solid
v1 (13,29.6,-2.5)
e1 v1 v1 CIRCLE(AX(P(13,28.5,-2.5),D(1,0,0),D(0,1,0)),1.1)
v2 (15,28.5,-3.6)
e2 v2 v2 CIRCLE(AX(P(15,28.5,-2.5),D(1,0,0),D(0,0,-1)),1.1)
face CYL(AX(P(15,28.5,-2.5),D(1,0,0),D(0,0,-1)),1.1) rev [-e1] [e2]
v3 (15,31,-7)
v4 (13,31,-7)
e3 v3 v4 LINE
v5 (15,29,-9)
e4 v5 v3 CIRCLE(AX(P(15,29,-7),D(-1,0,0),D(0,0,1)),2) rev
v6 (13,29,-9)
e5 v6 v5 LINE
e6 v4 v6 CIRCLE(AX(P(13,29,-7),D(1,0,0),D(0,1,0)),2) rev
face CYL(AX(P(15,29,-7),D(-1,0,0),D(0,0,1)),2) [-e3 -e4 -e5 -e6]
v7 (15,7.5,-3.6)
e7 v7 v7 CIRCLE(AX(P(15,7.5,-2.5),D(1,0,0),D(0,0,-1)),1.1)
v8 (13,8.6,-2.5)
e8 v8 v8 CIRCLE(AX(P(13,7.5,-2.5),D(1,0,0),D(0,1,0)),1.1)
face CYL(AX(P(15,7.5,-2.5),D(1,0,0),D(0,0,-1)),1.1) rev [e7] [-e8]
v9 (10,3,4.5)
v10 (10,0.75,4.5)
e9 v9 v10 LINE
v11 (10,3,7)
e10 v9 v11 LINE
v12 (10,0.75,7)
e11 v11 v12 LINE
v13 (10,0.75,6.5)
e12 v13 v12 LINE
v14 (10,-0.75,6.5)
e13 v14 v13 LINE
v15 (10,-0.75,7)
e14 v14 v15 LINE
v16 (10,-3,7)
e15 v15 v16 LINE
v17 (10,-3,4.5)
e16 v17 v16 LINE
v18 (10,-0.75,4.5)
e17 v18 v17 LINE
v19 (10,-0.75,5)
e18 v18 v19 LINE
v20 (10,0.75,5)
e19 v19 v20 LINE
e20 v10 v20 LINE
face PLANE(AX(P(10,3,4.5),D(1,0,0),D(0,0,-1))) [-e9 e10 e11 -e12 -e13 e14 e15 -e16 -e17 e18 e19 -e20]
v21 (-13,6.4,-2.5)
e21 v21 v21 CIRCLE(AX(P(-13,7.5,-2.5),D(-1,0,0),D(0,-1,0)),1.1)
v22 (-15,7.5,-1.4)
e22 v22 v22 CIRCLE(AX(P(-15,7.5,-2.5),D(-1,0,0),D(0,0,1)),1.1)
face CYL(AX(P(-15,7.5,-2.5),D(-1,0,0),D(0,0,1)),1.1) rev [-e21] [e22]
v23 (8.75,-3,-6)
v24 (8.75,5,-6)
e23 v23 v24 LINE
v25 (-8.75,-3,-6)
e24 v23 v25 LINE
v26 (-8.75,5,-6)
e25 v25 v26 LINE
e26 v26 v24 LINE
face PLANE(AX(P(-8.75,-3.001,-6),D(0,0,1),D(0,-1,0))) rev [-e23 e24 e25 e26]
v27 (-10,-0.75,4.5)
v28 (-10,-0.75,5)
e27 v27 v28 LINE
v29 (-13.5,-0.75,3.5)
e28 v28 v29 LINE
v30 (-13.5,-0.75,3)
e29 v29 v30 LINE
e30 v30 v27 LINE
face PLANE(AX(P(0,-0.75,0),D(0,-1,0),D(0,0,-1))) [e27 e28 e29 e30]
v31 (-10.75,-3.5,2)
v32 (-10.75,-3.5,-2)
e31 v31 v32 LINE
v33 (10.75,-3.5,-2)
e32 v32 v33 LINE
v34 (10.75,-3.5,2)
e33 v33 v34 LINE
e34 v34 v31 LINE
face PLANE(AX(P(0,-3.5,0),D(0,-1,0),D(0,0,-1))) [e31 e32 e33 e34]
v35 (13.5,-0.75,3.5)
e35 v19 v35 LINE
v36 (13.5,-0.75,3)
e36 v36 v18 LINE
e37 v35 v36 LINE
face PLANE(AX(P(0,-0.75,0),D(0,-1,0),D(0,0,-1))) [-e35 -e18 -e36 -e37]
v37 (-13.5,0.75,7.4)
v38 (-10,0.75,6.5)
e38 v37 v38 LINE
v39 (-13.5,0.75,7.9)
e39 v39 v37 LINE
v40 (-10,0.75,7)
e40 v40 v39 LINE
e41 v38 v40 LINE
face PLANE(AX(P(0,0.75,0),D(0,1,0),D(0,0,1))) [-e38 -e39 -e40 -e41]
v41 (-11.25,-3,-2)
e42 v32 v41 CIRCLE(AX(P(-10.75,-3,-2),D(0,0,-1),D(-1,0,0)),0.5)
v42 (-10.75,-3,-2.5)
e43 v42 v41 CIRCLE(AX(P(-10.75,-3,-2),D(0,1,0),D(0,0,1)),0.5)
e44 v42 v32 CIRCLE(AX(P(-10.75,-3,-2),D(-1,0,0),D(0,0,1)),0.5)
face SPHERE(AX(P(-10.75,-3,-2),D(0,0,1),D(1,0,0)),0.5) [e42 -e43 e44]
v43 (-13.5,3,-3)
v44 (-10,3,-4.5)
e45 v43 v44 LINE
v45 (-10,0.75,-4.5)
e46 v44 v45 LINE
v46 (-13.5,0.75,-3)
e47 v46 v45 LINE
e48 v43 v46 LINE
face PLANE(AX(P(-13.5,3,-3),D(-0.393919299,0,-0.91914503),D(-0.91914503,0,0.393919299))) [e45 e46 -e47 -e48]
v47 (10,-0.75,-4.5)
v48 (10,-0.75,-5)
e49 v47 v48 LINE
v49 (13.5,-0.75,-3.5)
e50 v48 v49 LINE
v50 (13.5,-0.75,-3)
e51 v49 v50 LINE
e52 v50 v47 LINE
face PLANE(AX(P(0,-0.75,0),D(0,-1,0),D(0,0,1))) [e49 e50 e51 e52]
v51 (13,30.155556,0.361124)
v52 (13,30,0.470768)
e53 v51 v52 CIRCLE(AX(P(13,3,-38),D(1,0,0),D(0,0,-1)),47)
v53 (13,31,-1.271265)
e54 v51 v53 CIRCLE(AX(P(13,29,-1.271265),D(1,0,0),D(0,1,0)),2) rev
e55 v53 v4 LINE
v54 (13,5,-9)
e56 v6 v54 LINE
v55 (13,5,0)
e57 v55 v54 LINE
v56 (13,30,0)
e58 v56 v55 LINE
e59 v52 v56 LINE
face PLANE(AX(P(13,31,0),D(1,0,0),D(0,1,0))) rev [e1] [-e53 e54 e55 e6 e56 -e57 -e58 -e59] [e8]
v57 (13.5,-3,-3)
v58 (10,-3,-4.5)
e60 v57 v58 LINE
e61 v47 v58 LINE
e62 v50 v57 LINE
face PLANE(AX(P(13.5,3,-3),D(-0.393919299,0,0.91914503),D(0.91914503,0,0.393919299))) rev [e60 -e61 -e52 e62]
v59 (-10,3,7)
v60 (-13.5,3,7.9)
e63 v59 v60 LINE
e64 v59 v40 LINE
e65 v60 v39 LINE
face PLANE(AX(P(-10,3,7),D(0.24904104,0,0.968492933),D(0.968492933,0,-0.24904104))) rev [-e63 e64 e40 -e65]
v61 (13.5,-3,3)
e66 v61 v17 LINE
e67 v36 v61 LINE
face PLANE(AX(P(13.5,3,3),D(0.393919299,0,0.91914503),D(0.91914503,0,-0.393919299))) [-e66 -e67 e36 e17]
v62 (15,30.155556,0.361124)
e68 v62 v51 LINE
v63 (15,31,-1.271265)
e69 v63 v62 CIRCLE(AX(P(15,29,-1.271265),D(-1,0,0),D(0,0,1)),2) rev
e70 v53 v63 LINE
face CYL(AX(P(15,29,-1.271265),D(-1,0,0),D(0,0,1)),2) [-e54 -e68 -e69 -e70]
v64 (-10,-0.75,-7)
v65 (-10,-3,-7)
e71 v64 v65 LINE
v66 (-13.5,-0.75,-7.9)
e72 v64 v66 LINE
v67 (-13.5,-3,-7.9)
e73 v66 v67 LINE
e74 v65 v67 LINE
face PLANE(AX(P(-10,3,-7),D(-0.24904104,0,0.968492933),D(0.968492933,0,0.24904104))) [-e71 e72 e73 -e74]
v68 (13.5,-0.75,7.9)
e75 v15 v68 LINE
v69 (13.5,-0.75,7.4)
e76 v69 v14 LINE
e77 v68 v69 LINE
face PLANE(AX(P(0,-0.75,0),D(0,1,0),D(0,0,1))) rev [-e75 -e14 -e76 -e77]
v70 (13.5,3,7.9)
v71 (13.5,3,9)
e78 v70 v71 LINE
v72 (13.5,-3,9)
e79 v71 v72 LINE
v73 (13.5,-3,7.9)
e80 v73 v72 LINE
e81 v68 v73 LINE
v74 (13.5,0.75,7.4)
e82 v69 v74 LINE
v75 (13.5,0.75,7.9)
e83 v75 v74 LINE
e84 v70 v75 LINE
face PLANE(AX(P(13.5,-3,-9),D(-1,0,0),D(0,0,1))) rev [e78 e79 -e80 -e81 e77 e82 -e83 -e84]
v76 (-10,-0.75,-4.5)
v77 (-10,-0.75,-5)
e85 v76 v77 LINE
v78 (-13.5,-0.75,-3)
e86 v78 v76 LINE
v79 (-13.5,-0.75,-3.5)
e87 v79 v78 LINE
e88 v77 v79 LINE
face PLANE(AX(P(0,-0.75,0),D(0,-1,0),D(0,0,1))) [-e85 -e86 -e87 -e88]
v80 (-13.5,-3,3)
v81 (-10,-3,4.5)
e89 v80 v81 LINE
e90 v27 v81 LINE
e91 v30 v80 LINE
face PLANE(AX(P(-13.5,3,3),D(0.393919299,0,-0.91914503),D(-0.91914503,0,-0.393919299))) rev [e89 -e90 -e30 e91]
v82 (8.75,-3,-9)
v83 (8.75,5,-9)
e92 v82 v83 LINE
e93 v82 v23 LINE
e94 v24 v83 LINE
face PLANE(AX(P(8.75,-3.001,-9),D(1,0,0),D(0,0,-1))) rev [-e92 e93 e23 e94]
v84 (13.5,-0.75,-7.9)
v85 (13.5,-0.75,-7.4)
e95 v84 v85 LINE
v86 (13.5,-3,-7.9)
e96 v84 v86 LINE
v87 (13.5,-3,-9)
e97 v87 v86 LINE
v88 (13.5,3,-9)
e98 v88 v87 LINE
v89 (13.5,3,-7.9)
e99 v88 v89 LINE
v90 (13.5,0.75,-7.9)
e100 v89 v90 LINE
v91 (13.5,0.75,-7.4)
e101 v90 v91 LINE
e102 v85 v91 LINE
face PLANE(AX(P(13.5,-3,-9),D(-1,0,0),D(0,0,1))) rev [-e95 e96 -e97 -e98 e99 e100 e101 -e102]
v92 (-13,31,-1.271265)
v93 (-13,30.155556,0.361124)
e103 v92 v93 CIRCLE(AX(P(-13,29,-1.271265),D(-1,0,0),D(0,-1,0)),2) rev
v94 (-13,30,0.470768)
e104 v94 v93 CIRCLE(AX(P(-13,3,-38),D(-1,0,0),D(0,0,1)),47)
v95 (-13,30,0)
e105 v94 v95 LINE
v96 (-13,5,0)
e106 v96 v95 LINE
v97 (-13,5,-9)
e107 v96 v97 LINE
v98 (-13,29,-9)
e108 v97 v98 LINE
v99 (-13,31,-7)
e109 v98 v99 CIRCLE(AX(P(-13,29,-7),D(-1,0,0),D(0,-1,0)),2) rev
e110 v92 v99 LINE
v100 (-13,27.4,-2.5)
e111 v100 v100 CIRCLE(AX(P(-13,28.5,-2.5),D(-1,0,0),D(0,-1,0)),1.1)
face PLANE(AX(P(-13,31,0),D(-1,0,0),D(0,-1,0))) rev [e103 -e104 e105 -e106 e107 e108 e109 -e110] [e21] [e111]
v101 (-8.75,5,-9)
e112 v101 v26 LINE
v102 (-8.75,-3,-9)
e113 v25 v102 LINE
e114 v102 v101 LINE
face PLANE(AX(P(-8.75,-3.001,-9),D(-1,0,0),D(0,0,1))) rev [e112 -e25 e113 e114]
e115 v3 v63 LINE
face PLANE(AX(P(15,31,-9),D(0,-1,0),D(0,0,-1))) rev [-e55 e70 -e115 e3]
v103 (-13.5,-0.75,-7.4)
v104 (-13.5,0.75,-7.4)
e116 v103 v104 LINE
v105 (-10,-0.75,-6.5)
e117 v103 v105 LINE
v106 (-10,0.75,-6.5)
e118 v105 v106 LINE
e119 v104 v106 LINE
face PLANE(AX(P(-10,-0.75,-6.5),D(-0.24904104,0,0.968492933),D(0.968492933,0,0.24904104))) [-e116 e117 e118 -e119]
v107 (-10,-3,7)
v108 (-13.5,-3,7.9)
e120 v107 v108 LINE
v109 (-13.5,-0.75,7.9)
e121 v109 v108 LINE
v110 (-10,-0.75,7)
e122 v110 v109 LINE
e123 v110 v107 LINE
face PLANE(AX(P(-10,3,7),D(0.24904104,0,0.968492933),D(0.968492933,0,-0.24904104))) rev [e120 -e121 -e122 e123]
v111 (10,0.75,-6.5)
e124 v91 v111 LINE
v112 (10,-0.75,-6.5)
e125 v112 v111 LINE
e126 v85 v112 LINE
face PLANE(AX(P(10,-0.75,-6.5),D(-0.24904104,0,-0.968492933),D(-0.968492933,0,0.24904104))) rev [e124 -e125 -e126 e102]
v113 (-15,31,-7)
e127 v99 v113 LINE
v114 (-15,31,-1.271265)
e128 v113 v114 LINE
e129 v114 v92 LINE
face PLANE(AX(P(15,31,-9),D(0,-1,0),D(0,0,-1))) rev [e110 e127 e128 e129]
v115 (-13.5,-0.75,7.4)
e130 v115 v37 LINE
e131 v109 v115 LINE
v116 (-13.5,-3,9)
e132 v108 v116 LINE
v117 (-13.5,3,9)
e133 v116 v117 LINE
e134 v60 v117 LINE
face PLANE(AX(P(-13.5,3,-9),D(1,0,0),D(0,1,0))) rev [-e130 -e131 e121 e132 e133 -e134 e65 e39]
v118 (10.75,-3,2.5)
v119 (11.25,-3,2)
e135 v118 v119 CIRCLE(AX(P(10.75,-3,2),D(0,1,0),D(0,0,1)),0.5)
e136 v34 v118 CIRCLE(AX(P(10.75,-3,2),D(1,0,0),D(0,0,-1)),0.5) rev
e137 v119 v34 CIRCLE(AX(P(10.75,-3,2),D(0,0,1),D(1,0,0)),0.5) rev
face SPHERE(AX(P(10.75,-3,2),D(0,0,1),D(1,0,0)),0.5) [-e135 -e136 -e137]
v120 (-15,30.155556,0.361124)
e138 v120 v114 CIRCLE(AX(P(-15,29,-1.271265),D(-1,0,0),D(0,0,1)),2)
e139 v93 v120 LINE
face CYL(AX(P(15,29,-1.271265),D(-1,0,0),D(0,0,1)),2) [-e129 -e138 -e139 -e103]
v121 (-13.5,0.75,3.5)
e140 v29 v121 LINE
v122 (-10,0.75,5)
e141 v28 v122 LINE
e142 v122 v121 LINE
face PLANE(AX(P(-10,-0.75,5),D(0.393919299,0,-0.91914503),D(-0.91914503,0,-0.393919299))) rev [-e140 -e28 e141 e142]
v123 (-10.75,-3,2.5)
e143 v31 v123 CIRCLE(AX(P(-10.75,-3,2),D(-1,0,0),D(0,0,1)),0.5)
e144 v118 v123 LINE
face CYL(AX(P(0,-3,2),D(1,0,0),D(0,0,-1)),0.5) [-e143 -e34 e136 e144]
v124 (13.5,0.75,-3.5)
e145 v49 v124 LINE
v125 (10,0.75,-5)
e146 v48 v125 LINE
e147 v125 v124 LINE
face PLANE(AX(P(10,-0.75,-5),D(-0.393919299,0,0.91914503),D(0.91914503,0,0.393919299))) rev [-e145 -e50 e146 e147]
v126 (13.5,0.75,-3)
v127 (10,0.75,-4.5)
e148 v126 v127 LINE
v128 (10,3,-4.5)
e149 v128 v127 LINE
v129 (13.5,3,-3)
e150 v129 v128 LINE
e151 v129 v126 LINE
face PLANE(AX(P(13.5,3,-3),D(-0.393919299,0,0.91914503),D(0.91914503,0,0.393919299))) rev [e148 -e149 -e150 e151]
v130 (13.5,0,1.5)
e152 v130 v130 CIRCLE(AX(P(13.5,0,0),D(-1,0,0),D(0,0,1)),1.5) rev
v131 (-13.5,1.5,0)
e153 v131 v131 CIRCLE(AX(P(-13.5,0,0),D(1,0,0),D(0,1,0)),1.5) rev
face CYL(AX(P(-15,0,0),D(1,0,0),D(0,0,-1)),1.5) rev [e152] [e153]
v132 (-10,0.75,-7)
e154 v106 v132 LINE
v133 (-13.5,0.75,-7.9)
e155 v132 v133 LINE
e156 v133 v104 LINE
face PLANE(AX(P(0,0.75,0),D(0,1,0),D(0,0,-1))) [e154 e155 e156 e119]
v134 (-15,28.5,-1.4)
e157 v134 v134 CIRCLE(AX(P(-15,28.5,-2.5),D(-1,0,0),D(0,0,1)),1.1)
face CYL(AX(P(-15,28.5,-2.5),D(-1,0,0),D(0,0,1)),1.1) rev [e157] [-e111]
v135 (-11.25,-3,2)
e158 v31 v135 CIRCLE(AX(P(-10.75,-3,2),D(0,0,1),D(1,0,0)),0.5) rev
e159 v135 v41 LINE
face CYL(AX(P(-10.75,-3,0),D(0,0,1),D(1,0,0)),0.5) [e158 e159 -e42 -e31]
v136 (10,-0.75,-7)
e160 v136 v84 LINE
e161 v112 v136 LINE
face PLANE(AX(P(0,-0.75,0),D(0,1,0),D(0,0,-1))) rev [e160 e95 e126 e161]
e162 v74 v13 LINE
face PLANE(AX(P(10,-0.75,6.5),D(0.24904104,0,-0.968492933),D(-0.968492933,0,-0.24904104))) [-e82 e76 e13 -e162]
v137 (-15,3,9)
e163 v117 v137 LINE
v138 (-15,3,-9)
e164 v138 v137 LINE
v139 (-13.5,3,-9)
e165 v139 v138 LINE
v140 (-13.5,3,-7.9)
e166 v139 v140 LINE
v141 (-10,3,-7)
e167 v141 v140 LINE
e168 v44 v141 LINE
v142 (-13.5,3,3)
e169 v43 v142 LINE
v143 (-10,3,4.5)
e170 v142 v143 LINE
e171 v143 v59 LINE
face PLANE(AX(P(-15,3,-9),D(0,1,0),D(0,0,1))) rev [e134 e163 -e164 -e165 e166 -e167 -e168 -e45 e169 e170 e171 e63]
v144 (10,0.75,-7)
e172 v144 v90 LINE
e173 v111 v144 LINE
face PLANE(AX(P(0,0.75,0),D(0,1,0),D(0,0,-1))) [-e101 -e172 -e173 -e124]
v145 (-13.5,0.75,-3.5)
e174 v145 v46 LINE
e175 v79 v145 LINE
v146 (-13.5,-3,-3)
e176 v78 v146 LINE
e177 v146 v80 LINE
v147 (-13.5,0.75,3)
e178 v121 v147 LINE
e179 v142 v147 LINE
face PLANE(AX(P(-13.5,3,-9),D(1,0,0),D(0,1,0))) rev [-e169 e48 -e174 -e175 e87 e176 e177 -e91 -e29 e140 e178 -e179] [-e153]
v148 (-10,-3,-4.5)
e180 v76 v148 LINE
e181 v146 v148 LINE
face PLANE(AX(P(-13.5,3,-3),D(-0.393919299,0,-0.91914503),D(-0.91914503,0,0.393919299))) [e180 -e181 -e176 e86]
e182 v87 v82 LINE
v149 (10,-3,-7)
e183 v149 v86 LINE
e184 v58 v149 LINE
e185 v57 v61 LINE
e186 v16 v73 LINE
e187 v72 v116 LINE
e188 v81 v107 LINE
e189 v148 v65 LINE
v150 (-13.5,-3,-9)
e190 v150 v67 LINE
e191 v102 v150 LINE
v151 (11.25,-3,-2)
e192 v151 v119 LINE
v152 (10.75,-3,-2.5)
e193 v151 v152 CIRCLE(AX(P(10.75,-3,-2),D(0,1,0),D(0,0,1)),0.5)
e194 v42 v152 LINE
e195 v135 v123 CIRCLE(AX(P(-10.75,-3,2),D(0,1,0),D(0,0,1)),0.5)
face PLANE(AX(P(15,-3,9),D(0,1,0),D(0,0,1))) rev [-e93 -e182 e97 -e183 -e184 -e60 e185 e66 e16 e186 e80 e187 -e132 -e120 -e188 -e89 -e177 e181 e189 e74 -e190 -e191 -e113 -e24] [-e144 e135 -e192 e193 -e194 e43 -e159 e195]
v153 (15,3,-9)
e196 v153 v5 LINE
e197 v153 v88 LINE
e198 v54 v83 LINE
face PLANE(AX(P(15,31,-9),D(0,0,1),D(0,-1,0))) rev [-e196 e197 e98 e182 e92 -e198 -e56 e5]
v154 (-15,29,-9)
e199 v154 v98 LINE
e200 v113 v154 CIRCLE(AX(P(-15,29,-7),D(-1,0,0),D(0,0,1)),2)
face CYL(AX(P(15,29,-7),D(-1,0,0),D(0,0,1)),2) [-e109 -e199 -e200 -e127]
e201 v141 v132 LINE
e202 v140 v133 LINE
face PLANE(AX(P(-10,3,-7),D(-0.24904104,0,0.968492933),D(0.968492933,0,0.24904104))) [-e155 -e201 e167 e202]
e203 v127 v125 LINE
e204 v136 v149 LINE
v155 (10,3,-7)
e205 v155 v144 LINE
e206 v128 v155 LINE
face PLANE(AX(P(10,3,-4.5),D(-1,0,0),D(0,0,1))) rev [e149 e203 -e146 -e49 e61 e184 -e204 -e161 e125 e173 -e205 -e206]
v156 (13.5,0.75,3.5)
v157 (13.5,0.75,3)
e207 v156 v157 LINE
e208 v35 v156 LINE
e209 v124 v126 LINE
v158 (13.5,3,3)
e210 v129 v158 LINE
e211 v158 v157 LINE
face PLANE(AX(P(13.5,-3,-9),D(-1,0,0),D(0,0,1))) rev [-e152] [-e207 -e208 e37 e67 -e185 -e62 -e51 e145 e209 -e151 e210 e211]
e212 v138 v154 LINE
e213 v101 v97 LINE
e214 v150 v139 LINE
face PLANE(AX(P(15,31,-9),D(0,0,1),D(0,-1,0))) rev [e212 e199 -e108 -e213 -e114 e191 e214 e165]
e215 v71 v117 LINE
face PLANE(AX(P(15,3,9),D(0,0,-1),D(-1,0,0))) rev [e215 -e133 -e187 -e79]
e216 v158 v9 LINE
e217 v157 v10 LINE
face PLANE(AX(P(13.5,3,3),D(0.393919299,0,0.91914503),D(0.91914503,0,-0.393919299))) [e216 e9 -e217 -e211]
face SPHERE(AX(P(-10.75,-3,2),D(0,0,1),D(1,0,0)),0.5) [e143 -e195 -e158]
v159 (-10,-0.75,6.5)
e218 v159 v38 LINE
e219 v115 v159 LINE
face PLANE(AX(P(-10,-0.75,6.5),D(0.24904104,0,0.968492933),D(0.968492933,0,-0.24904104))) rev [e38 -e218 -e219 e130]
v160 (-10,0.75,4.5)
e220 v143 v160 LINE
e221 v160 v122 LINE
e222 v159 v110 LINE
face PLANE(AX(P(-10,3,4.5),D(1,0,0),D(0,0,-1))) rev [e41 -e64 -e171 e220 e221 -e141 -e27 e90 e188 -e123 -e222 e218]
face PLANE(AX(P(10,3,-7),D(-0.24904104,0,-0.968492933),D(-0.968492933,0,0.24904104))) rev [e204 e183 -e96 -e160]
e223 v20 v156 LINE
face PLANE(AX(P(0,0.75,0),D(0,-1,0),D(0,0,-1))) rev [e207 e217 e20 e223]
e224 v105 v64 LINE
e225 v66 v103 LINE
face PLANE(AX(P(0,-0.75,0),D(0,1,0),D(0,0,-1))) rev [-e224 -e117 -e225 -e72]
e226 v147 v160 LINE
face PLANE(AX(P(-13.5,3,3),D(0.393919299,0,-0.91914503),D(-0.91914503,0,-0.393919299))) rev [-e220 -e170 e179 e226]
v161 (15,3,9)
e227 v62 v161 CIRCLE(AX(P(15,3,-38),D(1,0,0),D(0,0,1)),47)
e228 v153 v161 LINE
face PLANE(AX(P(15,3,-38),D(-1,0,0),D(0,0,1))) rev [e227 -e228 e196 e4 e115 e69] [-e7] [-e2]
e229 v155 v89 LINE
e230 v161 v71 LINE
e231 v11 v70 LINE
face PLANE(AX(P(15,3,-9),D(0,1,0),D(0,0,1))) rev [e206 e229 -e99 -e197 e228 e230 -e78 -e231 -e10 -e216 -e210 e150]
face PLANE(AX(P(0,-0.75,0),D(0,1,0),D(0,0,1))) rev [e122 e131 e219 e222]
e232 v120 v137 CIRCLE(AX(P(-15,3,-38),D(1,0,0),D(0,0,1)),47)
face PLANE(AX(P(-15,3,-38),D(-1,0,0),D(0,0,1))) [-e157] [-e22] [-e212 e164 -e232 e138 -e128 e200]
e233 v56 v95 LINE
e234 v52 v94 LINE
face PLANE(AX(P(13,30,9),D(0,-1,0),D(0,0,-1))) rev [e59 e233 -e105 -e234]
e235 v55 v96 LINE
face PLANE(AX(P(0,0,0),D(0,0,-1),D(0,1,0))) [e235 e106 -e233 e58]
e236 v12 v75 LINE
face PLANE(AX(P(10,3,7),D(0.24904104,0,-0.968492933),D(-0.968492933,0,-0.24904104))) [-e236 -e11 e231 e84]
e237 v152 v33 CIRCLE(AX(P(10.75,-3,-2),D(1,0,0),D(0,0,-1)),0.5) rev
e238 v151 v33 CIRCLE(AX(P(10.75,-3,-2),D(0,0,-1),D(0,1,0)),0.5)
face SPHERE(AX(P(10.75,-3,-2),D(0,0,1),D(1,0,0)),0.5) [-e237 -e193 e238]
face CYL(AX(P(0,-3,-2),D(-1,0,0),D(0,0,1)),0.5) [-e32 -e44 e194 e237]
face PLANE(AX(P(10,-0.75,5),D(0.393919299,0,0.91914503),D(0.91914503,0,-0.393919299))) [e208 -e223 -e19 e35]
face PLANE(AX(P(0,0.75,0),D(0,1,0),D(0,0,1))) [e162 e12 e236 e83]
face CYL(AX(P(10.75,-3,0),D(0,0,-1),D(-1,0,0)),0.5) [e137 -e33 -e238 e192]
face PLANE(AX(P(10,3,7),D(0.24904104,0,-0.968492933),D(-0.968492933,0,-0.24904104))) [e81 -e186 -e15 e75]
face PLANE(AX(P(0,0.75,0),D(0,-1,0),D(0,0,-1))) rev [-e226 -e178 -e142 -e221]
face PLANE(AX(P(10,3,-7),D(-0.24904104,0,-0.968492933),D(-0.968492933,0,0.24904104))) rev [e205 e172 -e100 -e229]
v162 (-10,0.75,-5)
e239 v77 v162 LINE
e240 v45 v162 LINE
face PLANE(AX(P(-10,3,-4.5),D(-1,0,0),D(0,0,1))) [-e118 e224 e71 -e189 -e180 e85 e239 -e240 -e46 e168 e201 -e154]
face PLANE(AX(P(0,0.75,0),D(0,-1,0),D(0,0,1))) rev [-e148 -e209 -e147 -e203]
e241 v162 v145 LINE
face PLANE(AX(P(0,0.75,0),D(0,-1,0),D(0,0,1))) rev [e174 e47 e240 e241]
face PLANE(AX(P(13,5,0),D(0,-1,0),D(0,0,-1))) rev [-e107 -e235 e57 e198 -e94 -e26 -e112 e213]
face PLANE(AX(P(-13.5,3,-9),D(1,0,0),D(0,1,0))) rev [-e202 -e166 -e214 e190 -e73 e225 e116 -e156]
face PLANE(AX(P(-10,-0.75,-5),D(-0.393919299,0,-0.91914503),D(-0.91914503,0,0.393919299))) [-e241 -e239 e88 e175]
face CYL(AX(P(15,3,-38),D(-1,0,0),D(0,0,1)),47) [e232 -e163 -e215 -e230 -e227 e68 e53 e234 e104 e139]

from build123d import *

# Parameters (mm, degrees)
EXTRUDE_1_DEPTH             = 15
CUT_EXTRUDE_1_DEPTH         = 9
FILLET_1_R                  = 2
CUT_EXTRUDE_2_REACH         = 33.337
SKETCH_4_R                  = 1.5000000000000007
CUT_EXTRUDE_3_DEPTH         = 45.068129073061414
SKETCH_6_W                  = 1.5
SKETCH_6_H                  = 6
CUT_EXTRUDE_5_DEPTH         = 39.8587184554509
CUT_EXTRUDE_4_DEPTH         = 6
SKETCH_7_W                  = 22.5
SKETCH_7_H                  = 5
EXTRUDE_2_DEPTH             = 0.5
FILLET_2_R                  = 0.5
HOLE_WIZARD_2_2_2_2_1_D     = 2.2
HOLE_WIZARD_2_2_2_2_1_DEPTH = 2
MIRROR_2_COPY_1_DEPTH       = 6
SKETCH_10_W                 = 26.000000000000004
SKETCH_10_H                 = 2.9999999999999964
CUT_EXTRUDE_6_DEPTH         = 36.59494346111538
EXTRUDE_3_DEPTH             = 0.75
MIRROR_4_COPY_1_DEPTH       = 0.75


with BuildPart() as part:
    # ｽｹｯﾁ1 → ﾎﾞｽ - 押し出し1 (new, symmetric)
    with BuildSketch(Plane(origin=(0, 0, 0), x_dir=(0, 0, -1), z_dir=(1, 0, 0))):
        with BuildLine():
            Line((8.999999999999996, 31.000000000000004), (0.2508278236462402, 31))
            ThreePointArc((0.2508278236462402, 31), (-6.627408015078736, 17.74430242011084), (-9, 3))
            Line((-9, 3), (-9, -3))
            Line((-9, -3), (9, -2.999999999999999))
            Line((9, -2.999999999999999), (8.999999999999996, 31.000000000000004))
        make_face()
    extrude(amount=EXTRUDE_1_DEPTH, both=True)

    # ｽｹｯﾁ2 → ｶｯﾄ - 押し出し1 (cut)
    with BuildSketch(Plane(origin=(0, 9.2e-16, -9), x_dir=(-1, 0, 0), z_dir=(0, 1e-16, -1))):
        Polygon((-13, 31.000000000000004), (13, 31.000000000000004), (13.000000000000002, 5), (-12.999999999999996, 5), align=None)
    extrude(amount=-CUT_EXTRUDE_1_DEPTH, mode=Mode.SUBTRACT)

    # ﾌｨﾚｯﾄ1
    fillet_1_edges = [part.edges().sort_by_distance(p)[0] for p in [
        (-14, 31.000000000000004, -8.999999999999996),
    ]]
    fillet(fillet_1_edges, radius=FILLET_1_R)
    fillet_1_2_edges = [part.edges().sort_by_distance(p)[0] for p in [
        (14, 31.000000000000004, -8.999999999999996),
    ]]
    fillet(fillet_1_2_edges, radius=FILLET_1_R)
    fillet_1_3_edges = [part.edges().sort_by_distance(p)[0] for p in [
        (-14, 31, -0.2508278236462367),
    ]]
    fillet(fillet_1_3_edges, radius=FILLET_1_R)

    # ｽｹｯﾁ3 → ｶｯﾄ - 押し出し2 (cut, up to next)
    with BuildSketch(Plane(origin=(0, 5, 5.1e-16), x_dir=(1, 0, 0), z_dir=(0, 1, 1e-16)), mode=Mode.PRIVATE) as cut_extrude_2_sk1:
        Polygon((-8.749999999999998, 9), (8.750000000000002, 9), (8.750000000000004, 5.999999999999999), (-8.749999999999998, 5.999999999999999), align=None)
    cut_extrude_2_tool1 = extrude(cut_extrude_2_sk1.sketch, amount=-CUT_EXTRUDE_2_REACH, mode=Mode.PRIVATE) & part.part
    add(cut_extrude_2_tool1.solids().sort_by_distance((0, 5, -7.5))[0], mode=Mode.SUBTRACT)

    # ｽｹｯﾁ4 → ｶｯﾄ - 押し出し3 (cut, through all)
    with BuildSketch(Plane(origin=(15, 0, 0), x_dir=(0, 0, -1), z_dir=(1, 0, 0))):
        Circle(SKETCH_4_R)
    extrude(amount=-CUT_EXTRUDE_3_DEPTH, mode=Mode.SUBTRACT)

    # ｽｹｯﾁ6 → ｶｯﾄ - 押し出し5 (cut, through all)
    with BuildSketch(Plane.XY.offset(9)):
        Polygon((-15, 3), (-13.5, 3), (-13.499999999999998, -3), (-15, -3), align=None)
        with Locations((14.250000000000002, 0)):
            Rectangle(SKETCH_6_W, SKETCH_6_H)
    extrude(amount=-CUT_EXTRUDE_5_DEPTH, mode=Mode.SUBTRACT)

    # ｽｹｯﾁ5 → ｶｯﾄ - 押し出し4 (cut)
    with BuildSketch(Plane.XZ.offset(2.9999999999999996)):
        Polygon((13.5, -3), (10, -4.500000000000001), (10, -7), (13.5, -7.9), align=None)
    cut_extrude_4 = extrude(amount=-CUT_EXTRUDE_4_DEPTH, mode=Mode.SUBTRACT)

    # ﾐﾗｰ1: ｶｯﾄ - 押し出し4 across plane
    add(cut_extrude_4.mirror(Plane.XY), mode=Mode.SUBTRACT)

    # ｽｹｯﾁ7 → ﾎﾞｽ - 押し出し2 (add)
    with BuildSketch(Plane.XZ.offset(2.9999999999999996)):
        Rectangle(SKETCH_7_W, SKETCH_7_H)
    extrude(amount=EXTRUDE_2_DEPTH)

    # ﾌｨﾚｯﾄ2
    fillet_2_edges = [part.edges().sort_by_distance(p)[0] for p in [
        (11.250000000000004, -3.2499999999999996, -2.5000000000000004),
        (11.250000000000004, -3.2499999999999996, 2.4999999999999996),
        (-11.249999999999996, -3.2499999999999996, 2.4999999999999996),
        (-11.249999999999996, -3.2499999999999996, -2.5000000000000004),
        (11.250000000000004, -3.4999999999999996, -6.1e-16),
        (3.55e-15, -3.4999999999999996, 2.4999999999999996),
        (-11.249999999999996, -3.4999999999999996, -6.1e-16),
        (3.55e-15, -3.4999999999999996, -2.5000000000000004),
    ]]
    fillet(fillet_2_edges, radius=FILLET_2_R - 0.0001)  # a hair under: the kernel refuses the full size

    # Ø2.2 (2.2) 直径の穴1
    with Locations(Plane(origin=(15, 0, 0), x_dir=(0, 0, -1), z_dir=(1, 0, 0))):
        with Locations((2.5, 28.5), (2.5, 7.5)):
            hole_wizard_2_2_2_2_1 = Hole(HOLE_WIZARD_2_2_2_2_1_D / 2, depth=HOLE_WIZARD_2_2_2_2_1_DEPTH)

    # ﾐﾗｰ2: ｶｯﾄ - 押し出し4, Ø2.2 (2.2) 直径の穴1 across plane
    add(cut_extrude_4.mirror(Plane(origin=(0, 0, 0), x_dir=(0, 0, 1), z_dir=(1, 0, 0))), mode=Mode.SUBTRACT)
    add(hole_wizard_2_2_2_2_1.mirror(Plane(origin=(0, 0, 0), x_dir=(0, 0, 1), z_dir=(1, 0, 0))), mode=Mode.SUBTRACT)

    # ﾐﾗｰ2 copy 1 sketch → ﾐﾗｰ2 copy 1 (cut)
    with BuildSketch(Plane(origin=(0, -2.9999999999999996, 1.4e-16), x_dir=(-1, 0, 0), z_dir=(0, -1, 5e-17))):
        Polygon((13.5, -3), (10, -4.500000000000001), (10, -7), (13.5, -7.9), align=None)
    extrude(amount=-MIRROR_2_COPY_1_DEPTH, mode=Mode.SUBTRACT)

    # ｽｹｯﾁ10 → ｶｯﾄ - 押し出し6 (cut, through all)
    with BuildSketch(Plane(origin=(0, 0, 0), x_dir=(-1, 0, 0), z_dir=(0, 1.3e-16, -1))):
        with Locations((0, 31.5)):
            Rectangle(SKETCH_10_W, SKETCH_10_H)
    extrude(amount=-CUT_EXTRUDE_6_DEPTH, mode=Mode.SUBTRACT)

    # ｽｹｯﾁ12 → ﾎﾞｽ - 押し出し3 (add, symmetric)
    with BuildSketch(Plane(origin=(0, 0, 0), x_dir=(-1, 0, 0), z_dir=(0, -1, -2e-17))):
        Polygon((13.5, -7.9), (9.999999999999998, -7), (10, -6.500000000000001), (13.5, -7.4), align=None)
        Polygon((10, -4.500000000000001), (10, -5), (13.499999999999998, -3.4999999999999982), (13.5, -2.9999999999999996), align=None)
    extrude_3 = extrude(amount=EXTRUDE_3_DEPTH, both=True)

    # ﾐﾗｰ3: ﾎﾞｽ - 押し出し3 across plane
    add(extrude_3.mirror(Plane.XY))

    # ﾐﾗｰ4: ﾎﾞｽ - 押し出し3 across plane
    add(extrude_3.mirror(Plane(origin=(0, 0, 0), x_dir=(0, 0, 1), z_dir=(1, 0, 0))))

    # ﾐﾗｰ4 copy 1 sketch → ﾐﾗｰ4 copy 1 (add, symmetric)
    with BuildSketch(Plane.XZ):
        Polygon((13.5, -7.9), (9.999999999999998, -7), (10, -6.500000000000001), (13.5, -7.4), align=None)
        Polygon((10, -4.500000000000001), (10, -5), (13.499999999999998, -3.4999999999999982), (13.5, -2.9999999999999996), align=None)
    extrude(amount=MIRROR_4_COPY_1_DEPTH, both=True)


solid = part.part
